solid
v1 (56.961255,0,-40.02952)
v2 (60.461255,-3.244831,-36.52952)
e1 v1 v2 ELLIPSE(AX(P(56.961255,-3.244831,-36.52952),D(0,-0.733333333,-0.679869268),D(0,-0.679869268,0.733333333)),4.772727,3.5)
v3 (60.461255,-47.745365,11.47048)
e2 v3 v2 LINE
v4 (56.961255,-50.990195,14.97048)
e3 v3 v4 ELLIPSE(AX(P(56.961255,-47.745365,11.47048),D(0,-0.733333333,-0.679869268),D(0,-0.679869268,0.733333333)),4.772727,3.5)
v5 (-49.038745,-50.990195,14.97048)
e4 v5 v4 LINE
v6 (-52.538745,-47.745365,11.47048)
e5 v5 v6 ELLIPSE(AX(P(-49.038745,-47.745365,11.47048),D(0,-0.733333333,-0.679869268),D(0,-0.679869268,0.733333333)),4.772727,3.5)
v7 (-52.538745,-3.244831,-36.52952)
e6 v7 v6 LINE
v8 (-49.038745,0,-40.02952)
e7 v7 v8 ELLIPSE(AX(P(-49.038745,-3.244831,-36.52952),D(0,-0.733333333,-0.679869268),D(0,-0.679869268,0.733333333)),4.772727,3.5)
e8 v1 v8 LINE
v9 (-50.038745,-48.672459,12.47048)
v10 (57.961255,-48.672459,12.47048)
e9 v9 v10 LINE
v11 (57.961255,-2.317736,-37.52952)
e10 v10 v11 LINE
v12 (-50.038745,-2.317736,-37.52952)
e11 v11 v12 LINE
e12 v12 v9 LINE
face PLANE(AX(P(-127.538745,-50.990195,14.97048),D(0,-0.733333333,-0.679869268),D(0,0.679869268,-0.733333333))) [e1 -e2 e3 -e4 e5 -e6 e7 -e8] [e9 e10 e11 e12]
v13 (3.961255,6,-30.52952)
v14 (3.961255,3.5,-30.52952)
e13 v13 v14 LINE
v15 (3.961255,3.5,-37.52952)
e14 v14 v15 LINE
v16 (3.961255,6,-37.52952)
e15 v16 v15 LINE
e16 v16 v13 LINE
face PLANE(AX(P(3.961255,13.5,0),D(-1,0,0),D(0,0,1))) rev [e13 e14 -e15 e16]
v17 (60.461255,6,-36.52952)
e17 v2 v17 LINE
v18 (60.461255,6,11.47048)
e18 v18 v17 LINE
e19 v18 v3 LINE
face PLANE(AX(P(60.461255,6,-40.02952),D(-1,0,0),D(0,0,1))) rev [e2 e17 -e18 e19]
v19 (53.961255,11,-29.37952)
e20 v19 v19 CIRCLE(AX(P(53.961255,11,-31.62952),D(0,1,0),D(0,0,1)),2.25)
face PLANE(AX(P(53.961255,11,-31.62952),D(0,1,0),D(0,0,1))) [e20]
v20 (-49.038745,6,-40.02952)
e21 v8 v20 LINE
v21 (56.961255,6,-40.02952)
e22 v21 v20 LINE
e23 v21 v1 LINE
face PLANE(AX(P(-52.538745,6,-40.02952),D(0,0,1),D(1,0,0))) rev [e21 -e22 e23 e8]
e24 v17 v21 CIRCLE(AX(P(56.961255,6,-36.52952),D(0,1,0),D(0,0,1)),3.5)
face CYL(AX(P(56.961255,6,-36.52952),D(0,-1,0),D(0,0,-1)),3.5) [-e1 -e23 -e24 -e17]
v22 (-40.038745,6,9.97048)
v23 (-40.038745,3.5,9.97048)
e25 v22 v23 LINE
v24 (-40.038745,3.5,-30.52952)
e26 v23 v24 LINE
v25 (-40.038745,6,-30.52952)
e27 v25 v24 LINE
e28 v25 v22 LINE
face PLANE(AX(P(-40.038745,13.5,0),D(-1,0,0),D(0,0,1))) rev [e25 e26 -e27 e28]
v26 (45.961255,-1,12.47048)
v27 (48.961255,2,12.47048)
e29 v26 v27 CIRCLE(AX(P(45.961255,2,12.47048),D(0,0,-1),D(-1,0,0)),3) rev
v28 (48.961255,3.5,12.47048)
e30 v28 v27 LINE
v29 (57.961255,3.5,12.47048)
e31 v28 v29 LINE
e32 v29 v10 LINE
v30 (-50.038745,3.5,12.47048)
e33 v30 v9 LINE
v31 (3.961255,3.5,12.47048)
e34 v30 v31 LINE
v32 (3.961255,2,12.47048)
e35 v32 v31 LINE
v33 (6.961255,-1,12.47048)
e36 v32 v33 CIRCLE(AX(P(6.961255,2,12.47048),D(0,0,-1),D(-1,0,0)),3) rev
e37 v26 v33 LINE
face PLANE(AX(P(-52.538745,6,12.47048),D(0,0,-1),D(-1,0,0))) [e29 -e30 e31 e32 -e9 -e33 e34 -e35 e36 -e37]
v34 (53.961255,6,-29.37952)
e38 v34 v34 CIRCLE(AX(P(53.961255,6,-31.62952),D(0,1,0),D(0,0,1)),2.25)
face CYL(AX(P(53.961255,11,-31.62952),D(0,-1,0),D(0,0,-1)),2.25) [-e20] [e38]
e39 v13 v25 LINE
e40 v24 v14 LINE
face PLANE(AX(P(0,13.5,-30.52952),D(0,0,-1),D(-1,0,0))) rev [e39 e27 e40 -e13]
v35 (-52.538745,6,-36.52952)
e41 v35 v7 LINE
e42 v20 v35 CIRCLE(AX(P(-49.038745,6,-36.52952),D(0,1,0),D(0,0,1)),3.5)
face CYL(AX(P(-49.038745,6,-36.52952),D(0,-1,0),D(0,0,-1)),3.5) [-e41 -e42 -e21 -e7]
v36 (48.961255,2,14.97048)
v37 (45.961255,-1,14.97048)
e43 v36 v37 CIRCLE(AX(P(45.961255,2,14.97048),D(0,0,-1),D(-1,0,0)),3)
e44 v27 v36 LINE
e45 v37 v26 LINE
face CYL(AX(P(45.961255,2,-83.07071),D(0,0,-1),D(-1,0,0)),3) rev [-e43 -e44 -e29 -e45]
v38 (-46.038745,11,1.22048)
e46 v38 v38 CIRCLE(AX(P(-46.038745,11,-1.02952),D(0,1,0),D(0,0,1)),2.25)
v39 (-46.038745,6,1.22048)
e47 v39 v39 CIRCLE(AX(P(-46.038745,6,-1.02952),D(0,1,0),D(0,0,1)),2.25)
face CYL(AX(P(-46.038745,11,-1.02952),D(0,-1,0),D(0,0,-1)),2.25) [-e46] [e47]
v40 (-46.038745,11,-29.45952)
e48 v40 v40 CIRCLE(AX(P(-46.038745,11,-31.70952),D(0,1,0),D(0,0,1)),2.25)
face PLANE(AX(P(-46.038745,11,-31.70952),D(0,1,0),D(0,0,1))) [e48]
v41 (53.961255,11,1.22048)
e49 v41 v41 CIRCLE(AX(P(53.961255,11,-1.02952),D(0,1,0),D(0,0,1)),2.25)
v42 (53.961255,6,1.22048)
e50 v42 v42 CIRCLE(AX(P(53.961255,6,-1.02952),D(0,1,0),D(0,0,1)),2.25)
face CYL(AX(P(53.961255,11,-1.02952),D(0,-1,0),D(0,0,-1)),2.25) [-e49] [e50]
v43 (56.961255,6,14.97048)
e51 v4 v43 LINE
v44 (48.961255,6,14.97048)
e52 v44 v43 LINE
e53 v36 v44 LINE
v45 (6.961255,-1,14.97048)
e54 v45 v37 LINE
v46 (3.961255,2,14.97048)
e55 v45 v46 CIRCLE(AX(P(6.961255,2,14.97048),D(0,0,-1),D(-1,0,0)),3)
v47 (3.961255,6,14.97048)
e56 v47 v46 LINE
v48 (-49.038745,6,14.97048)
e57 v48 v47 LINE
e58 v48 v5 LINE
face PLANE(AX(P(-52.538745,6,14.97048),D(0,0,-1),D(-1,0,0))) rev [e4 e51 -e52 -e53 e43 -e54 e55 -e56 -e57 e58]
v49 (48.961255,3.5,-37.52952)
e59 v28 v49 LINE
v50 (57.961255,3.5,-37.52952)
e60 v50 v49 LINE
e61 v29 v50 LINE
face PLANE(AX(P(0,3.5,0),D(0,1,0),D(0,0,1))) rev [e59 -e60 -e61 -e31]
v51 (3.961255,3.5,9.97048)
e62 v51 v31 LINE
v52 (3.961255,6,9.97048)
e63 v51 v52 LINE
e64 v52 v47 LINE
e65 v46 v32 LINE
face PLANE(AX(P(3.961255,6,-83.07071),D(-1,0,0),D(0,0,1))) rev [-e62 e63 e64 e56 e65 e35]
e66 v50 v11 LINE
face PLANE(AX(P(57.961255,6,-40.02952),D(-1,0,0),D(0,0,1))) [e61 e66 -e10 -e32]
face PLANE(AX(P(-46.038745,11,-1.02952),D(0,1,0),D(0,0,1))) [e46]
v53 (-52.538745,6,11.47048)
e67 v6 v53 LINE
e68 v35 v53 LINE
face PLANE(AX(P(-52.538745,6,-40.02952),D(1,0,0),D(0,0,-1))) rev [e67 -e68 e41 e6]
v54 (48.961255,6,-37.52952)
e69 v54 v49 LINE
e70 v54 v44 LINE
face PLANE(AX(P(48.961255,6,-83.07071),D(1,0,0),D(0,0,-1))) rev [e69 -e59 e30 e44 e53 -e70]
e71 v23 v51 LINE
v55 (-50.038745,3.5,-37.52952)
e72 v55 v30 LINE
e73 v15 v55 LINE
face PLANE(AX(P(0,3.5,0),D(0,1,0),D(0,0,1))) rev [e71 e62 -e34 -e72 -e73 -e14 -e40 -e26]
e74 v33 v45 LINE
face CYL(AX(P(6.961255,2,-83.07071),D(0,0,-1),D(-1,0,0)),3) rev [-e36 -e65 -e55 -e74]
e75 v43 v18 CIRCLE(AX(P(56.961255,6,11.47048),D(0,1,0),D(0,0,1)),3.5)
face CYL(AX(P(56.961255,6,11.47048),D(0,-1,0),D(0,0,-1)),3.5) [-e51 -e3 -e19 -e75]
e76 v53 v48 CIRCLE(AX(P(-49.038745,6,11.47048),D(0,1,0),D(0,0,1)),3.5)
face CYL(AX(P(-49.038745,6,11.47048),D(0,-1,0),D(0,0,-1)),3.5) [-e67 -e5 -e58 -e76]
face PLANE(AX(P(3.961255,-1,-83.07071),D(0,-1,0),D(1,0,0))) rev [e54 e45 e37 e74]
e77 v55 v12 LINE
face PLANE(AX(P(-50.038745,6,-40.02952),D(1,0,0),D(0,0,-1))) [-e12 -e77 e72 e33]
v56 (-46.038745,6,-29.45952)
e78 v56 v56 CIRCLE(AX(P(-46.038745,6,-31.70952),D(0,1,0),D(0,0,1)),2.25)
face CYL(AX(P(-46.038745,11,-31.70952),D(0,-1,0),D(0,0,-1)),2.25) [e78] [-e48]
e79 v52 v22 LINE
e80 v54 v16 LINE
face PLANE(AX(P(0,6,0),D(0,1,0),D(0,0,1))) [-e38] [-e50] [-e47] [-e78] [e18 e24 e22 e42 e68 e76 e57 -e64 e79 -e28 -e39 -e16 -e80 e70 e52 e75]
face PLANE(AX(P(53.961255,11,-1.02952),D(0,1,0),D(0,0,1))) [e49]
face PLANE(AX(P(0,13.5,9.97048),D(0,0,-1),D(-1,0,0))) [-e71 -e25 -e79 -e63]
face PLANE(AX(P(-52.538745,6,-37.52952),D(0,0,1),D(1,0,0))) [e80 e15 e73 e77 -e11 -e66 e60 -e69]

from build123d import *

# Parameters (mm, degrees)
SKETCH1_W           = 113
SKETCH1_H           = 55
BOSS_EXTRUDE1_DEPTH = 6
BOSS_EXTRUDE3_DEPTH = 113
SKETCH2_R           = 2.25
BOSS_EXTRUDE2_DEPTH = 5
SHELL1_START        = -50.038745387
SHELL1_DEPTH        = 108
SKETCH4_W           = 44
SKETCH4_H           = 7
SKETCH4_W_2         = 88
SKETCH4_H_2         = 40.5
CUT_EXTRUDE1_DEPTH  = 10
FILLET2_R           = 3.5
CUT_EXTRUDE2_START  = -52.5
SKETCH5_W           = 45
SKETCH5_H           = 7
CUT_EXTRUDE2_DEPTH  = 52.5
FILLET3_R           = 3


# Read off the part's stored shape, not the designer's step: Shell1
with BuildPart() as part:
    # Sketch1 → Boss-Extrude1 (new body)
    with BuildSketch(Plane(origin=(0, 0, 0), x_dir=(1, 0, 0), z_dir=(0, 1, 0))):
        with Locations((3.961254613, 12.529520295)):
            Rectangle(SKETCH1_W, SKETCH1_H)
    extrude(amount=BOSS_EXTRUDE1_DEPTH)

    # Sketch3 → Boss-Extrude3 (add)
    with BuildSketch(Plane(origin=(60.461254613, 0, 0), x_dir=(0, 0, -1), z_dir=(1, 0, 0))):
        Polygon((-14.970479705, 0), (-14.970479705, -50.990195136), (40.029520295, 0), align=None)
    extrude(amount=-BOSS_EXTRUDE3_DEPTH)

    # Sketch2 → Boss-Extrude2 (add)
    with BuildSketch(Plane(origin=(0, 6, 0), x_dir=(1, 0, 0), z_dir=(0, 1, 0))):
        with Locations(Location((-46.038745387, 31.709520295, 0), (0, 0, 270))):
            Circle(SKETCH2_R)
        with Locations(Location((53.961254613, 31.629520295, 0), (0, 0, 270))):
            Circle(SKETCH2_R)
        with Locations(Location((53.961254613, 1.029520295, 0), (0, 0, 270))):
            Circle(SKETCH2_R)
        with Locations(Location((-46.038745387, 1.029520295, 0), (0, 0, 270))):
            Circle(SKETCH2_R)
    extrude(amount=BOSS_EXTRUDE2_DEPTH)

    # Shell1 outline → Shell1 (cut)
    with BuildSketch(Plane.YZ.offset(SHELL1_START)):
        Polygon((3.5, 12.470479705), (-48.672458993, 12.470479705), (-2.317736143, -37.529520295), (3.5, -37.529520295), align=None)
    extrude(amount=SHELL1_DEPTH, mode=Mode.SUBTRACT)

    # Sketch4 → Cut-Extrude1 (cut)
    with BuildSketch(Plane.XZ.offset(-3.5)):
        with Locations((25.961254613, -34.029520295)):
            Rectangle(SKETCH4_W, SKETCH4_H)
        with Locations((3.961254613, -10.279520295)):
            Rectangle(SKETCH4_W_2, SKETCH4_H_2)
    extrude(amount=-CUT_EXTRUDE1_DEPTH, mode=Mode.SUBTRACT)

    # Fillet2
    fillet2_edges = [part.edges().sort_by_distance(p)[0] for p in [
        (-52.538745387, 3, -40.029520295),
        (60.461254613, 3, -40.029520295),
        (60.461254613, -22.495097568, 14.970479705),
        (-52.538745387, -22.495097568, 14.970479705),
    ]]
    fillet(fillet2_edges, radius=FILLET2_R)

    # Sketch5 → Cut-Extrude2 (cut)
    with BuildSketch(Plane.XY.offset(14.970479705).offset(CUT_EXTRUDE2_START)):
        with Locations((26.461254613, 2.5)):
            Rectangle(SKETCH5_W, SKETCH5_H)
    extrude(amount=CUT_EXTRUDE2_DEPTH, mode=Mode.SUBTRACT)

    # Fillet3
    fillet3_edges = [part.edges().sort_by_distance(p)[0] for p in [
        (3.961254613, -1, 13.720479705),
        (48.961254613, -1, 13.720479705),
    ]]
    fillet(fillet3_edges, radius=FILLET3_R)


solid = part.part
